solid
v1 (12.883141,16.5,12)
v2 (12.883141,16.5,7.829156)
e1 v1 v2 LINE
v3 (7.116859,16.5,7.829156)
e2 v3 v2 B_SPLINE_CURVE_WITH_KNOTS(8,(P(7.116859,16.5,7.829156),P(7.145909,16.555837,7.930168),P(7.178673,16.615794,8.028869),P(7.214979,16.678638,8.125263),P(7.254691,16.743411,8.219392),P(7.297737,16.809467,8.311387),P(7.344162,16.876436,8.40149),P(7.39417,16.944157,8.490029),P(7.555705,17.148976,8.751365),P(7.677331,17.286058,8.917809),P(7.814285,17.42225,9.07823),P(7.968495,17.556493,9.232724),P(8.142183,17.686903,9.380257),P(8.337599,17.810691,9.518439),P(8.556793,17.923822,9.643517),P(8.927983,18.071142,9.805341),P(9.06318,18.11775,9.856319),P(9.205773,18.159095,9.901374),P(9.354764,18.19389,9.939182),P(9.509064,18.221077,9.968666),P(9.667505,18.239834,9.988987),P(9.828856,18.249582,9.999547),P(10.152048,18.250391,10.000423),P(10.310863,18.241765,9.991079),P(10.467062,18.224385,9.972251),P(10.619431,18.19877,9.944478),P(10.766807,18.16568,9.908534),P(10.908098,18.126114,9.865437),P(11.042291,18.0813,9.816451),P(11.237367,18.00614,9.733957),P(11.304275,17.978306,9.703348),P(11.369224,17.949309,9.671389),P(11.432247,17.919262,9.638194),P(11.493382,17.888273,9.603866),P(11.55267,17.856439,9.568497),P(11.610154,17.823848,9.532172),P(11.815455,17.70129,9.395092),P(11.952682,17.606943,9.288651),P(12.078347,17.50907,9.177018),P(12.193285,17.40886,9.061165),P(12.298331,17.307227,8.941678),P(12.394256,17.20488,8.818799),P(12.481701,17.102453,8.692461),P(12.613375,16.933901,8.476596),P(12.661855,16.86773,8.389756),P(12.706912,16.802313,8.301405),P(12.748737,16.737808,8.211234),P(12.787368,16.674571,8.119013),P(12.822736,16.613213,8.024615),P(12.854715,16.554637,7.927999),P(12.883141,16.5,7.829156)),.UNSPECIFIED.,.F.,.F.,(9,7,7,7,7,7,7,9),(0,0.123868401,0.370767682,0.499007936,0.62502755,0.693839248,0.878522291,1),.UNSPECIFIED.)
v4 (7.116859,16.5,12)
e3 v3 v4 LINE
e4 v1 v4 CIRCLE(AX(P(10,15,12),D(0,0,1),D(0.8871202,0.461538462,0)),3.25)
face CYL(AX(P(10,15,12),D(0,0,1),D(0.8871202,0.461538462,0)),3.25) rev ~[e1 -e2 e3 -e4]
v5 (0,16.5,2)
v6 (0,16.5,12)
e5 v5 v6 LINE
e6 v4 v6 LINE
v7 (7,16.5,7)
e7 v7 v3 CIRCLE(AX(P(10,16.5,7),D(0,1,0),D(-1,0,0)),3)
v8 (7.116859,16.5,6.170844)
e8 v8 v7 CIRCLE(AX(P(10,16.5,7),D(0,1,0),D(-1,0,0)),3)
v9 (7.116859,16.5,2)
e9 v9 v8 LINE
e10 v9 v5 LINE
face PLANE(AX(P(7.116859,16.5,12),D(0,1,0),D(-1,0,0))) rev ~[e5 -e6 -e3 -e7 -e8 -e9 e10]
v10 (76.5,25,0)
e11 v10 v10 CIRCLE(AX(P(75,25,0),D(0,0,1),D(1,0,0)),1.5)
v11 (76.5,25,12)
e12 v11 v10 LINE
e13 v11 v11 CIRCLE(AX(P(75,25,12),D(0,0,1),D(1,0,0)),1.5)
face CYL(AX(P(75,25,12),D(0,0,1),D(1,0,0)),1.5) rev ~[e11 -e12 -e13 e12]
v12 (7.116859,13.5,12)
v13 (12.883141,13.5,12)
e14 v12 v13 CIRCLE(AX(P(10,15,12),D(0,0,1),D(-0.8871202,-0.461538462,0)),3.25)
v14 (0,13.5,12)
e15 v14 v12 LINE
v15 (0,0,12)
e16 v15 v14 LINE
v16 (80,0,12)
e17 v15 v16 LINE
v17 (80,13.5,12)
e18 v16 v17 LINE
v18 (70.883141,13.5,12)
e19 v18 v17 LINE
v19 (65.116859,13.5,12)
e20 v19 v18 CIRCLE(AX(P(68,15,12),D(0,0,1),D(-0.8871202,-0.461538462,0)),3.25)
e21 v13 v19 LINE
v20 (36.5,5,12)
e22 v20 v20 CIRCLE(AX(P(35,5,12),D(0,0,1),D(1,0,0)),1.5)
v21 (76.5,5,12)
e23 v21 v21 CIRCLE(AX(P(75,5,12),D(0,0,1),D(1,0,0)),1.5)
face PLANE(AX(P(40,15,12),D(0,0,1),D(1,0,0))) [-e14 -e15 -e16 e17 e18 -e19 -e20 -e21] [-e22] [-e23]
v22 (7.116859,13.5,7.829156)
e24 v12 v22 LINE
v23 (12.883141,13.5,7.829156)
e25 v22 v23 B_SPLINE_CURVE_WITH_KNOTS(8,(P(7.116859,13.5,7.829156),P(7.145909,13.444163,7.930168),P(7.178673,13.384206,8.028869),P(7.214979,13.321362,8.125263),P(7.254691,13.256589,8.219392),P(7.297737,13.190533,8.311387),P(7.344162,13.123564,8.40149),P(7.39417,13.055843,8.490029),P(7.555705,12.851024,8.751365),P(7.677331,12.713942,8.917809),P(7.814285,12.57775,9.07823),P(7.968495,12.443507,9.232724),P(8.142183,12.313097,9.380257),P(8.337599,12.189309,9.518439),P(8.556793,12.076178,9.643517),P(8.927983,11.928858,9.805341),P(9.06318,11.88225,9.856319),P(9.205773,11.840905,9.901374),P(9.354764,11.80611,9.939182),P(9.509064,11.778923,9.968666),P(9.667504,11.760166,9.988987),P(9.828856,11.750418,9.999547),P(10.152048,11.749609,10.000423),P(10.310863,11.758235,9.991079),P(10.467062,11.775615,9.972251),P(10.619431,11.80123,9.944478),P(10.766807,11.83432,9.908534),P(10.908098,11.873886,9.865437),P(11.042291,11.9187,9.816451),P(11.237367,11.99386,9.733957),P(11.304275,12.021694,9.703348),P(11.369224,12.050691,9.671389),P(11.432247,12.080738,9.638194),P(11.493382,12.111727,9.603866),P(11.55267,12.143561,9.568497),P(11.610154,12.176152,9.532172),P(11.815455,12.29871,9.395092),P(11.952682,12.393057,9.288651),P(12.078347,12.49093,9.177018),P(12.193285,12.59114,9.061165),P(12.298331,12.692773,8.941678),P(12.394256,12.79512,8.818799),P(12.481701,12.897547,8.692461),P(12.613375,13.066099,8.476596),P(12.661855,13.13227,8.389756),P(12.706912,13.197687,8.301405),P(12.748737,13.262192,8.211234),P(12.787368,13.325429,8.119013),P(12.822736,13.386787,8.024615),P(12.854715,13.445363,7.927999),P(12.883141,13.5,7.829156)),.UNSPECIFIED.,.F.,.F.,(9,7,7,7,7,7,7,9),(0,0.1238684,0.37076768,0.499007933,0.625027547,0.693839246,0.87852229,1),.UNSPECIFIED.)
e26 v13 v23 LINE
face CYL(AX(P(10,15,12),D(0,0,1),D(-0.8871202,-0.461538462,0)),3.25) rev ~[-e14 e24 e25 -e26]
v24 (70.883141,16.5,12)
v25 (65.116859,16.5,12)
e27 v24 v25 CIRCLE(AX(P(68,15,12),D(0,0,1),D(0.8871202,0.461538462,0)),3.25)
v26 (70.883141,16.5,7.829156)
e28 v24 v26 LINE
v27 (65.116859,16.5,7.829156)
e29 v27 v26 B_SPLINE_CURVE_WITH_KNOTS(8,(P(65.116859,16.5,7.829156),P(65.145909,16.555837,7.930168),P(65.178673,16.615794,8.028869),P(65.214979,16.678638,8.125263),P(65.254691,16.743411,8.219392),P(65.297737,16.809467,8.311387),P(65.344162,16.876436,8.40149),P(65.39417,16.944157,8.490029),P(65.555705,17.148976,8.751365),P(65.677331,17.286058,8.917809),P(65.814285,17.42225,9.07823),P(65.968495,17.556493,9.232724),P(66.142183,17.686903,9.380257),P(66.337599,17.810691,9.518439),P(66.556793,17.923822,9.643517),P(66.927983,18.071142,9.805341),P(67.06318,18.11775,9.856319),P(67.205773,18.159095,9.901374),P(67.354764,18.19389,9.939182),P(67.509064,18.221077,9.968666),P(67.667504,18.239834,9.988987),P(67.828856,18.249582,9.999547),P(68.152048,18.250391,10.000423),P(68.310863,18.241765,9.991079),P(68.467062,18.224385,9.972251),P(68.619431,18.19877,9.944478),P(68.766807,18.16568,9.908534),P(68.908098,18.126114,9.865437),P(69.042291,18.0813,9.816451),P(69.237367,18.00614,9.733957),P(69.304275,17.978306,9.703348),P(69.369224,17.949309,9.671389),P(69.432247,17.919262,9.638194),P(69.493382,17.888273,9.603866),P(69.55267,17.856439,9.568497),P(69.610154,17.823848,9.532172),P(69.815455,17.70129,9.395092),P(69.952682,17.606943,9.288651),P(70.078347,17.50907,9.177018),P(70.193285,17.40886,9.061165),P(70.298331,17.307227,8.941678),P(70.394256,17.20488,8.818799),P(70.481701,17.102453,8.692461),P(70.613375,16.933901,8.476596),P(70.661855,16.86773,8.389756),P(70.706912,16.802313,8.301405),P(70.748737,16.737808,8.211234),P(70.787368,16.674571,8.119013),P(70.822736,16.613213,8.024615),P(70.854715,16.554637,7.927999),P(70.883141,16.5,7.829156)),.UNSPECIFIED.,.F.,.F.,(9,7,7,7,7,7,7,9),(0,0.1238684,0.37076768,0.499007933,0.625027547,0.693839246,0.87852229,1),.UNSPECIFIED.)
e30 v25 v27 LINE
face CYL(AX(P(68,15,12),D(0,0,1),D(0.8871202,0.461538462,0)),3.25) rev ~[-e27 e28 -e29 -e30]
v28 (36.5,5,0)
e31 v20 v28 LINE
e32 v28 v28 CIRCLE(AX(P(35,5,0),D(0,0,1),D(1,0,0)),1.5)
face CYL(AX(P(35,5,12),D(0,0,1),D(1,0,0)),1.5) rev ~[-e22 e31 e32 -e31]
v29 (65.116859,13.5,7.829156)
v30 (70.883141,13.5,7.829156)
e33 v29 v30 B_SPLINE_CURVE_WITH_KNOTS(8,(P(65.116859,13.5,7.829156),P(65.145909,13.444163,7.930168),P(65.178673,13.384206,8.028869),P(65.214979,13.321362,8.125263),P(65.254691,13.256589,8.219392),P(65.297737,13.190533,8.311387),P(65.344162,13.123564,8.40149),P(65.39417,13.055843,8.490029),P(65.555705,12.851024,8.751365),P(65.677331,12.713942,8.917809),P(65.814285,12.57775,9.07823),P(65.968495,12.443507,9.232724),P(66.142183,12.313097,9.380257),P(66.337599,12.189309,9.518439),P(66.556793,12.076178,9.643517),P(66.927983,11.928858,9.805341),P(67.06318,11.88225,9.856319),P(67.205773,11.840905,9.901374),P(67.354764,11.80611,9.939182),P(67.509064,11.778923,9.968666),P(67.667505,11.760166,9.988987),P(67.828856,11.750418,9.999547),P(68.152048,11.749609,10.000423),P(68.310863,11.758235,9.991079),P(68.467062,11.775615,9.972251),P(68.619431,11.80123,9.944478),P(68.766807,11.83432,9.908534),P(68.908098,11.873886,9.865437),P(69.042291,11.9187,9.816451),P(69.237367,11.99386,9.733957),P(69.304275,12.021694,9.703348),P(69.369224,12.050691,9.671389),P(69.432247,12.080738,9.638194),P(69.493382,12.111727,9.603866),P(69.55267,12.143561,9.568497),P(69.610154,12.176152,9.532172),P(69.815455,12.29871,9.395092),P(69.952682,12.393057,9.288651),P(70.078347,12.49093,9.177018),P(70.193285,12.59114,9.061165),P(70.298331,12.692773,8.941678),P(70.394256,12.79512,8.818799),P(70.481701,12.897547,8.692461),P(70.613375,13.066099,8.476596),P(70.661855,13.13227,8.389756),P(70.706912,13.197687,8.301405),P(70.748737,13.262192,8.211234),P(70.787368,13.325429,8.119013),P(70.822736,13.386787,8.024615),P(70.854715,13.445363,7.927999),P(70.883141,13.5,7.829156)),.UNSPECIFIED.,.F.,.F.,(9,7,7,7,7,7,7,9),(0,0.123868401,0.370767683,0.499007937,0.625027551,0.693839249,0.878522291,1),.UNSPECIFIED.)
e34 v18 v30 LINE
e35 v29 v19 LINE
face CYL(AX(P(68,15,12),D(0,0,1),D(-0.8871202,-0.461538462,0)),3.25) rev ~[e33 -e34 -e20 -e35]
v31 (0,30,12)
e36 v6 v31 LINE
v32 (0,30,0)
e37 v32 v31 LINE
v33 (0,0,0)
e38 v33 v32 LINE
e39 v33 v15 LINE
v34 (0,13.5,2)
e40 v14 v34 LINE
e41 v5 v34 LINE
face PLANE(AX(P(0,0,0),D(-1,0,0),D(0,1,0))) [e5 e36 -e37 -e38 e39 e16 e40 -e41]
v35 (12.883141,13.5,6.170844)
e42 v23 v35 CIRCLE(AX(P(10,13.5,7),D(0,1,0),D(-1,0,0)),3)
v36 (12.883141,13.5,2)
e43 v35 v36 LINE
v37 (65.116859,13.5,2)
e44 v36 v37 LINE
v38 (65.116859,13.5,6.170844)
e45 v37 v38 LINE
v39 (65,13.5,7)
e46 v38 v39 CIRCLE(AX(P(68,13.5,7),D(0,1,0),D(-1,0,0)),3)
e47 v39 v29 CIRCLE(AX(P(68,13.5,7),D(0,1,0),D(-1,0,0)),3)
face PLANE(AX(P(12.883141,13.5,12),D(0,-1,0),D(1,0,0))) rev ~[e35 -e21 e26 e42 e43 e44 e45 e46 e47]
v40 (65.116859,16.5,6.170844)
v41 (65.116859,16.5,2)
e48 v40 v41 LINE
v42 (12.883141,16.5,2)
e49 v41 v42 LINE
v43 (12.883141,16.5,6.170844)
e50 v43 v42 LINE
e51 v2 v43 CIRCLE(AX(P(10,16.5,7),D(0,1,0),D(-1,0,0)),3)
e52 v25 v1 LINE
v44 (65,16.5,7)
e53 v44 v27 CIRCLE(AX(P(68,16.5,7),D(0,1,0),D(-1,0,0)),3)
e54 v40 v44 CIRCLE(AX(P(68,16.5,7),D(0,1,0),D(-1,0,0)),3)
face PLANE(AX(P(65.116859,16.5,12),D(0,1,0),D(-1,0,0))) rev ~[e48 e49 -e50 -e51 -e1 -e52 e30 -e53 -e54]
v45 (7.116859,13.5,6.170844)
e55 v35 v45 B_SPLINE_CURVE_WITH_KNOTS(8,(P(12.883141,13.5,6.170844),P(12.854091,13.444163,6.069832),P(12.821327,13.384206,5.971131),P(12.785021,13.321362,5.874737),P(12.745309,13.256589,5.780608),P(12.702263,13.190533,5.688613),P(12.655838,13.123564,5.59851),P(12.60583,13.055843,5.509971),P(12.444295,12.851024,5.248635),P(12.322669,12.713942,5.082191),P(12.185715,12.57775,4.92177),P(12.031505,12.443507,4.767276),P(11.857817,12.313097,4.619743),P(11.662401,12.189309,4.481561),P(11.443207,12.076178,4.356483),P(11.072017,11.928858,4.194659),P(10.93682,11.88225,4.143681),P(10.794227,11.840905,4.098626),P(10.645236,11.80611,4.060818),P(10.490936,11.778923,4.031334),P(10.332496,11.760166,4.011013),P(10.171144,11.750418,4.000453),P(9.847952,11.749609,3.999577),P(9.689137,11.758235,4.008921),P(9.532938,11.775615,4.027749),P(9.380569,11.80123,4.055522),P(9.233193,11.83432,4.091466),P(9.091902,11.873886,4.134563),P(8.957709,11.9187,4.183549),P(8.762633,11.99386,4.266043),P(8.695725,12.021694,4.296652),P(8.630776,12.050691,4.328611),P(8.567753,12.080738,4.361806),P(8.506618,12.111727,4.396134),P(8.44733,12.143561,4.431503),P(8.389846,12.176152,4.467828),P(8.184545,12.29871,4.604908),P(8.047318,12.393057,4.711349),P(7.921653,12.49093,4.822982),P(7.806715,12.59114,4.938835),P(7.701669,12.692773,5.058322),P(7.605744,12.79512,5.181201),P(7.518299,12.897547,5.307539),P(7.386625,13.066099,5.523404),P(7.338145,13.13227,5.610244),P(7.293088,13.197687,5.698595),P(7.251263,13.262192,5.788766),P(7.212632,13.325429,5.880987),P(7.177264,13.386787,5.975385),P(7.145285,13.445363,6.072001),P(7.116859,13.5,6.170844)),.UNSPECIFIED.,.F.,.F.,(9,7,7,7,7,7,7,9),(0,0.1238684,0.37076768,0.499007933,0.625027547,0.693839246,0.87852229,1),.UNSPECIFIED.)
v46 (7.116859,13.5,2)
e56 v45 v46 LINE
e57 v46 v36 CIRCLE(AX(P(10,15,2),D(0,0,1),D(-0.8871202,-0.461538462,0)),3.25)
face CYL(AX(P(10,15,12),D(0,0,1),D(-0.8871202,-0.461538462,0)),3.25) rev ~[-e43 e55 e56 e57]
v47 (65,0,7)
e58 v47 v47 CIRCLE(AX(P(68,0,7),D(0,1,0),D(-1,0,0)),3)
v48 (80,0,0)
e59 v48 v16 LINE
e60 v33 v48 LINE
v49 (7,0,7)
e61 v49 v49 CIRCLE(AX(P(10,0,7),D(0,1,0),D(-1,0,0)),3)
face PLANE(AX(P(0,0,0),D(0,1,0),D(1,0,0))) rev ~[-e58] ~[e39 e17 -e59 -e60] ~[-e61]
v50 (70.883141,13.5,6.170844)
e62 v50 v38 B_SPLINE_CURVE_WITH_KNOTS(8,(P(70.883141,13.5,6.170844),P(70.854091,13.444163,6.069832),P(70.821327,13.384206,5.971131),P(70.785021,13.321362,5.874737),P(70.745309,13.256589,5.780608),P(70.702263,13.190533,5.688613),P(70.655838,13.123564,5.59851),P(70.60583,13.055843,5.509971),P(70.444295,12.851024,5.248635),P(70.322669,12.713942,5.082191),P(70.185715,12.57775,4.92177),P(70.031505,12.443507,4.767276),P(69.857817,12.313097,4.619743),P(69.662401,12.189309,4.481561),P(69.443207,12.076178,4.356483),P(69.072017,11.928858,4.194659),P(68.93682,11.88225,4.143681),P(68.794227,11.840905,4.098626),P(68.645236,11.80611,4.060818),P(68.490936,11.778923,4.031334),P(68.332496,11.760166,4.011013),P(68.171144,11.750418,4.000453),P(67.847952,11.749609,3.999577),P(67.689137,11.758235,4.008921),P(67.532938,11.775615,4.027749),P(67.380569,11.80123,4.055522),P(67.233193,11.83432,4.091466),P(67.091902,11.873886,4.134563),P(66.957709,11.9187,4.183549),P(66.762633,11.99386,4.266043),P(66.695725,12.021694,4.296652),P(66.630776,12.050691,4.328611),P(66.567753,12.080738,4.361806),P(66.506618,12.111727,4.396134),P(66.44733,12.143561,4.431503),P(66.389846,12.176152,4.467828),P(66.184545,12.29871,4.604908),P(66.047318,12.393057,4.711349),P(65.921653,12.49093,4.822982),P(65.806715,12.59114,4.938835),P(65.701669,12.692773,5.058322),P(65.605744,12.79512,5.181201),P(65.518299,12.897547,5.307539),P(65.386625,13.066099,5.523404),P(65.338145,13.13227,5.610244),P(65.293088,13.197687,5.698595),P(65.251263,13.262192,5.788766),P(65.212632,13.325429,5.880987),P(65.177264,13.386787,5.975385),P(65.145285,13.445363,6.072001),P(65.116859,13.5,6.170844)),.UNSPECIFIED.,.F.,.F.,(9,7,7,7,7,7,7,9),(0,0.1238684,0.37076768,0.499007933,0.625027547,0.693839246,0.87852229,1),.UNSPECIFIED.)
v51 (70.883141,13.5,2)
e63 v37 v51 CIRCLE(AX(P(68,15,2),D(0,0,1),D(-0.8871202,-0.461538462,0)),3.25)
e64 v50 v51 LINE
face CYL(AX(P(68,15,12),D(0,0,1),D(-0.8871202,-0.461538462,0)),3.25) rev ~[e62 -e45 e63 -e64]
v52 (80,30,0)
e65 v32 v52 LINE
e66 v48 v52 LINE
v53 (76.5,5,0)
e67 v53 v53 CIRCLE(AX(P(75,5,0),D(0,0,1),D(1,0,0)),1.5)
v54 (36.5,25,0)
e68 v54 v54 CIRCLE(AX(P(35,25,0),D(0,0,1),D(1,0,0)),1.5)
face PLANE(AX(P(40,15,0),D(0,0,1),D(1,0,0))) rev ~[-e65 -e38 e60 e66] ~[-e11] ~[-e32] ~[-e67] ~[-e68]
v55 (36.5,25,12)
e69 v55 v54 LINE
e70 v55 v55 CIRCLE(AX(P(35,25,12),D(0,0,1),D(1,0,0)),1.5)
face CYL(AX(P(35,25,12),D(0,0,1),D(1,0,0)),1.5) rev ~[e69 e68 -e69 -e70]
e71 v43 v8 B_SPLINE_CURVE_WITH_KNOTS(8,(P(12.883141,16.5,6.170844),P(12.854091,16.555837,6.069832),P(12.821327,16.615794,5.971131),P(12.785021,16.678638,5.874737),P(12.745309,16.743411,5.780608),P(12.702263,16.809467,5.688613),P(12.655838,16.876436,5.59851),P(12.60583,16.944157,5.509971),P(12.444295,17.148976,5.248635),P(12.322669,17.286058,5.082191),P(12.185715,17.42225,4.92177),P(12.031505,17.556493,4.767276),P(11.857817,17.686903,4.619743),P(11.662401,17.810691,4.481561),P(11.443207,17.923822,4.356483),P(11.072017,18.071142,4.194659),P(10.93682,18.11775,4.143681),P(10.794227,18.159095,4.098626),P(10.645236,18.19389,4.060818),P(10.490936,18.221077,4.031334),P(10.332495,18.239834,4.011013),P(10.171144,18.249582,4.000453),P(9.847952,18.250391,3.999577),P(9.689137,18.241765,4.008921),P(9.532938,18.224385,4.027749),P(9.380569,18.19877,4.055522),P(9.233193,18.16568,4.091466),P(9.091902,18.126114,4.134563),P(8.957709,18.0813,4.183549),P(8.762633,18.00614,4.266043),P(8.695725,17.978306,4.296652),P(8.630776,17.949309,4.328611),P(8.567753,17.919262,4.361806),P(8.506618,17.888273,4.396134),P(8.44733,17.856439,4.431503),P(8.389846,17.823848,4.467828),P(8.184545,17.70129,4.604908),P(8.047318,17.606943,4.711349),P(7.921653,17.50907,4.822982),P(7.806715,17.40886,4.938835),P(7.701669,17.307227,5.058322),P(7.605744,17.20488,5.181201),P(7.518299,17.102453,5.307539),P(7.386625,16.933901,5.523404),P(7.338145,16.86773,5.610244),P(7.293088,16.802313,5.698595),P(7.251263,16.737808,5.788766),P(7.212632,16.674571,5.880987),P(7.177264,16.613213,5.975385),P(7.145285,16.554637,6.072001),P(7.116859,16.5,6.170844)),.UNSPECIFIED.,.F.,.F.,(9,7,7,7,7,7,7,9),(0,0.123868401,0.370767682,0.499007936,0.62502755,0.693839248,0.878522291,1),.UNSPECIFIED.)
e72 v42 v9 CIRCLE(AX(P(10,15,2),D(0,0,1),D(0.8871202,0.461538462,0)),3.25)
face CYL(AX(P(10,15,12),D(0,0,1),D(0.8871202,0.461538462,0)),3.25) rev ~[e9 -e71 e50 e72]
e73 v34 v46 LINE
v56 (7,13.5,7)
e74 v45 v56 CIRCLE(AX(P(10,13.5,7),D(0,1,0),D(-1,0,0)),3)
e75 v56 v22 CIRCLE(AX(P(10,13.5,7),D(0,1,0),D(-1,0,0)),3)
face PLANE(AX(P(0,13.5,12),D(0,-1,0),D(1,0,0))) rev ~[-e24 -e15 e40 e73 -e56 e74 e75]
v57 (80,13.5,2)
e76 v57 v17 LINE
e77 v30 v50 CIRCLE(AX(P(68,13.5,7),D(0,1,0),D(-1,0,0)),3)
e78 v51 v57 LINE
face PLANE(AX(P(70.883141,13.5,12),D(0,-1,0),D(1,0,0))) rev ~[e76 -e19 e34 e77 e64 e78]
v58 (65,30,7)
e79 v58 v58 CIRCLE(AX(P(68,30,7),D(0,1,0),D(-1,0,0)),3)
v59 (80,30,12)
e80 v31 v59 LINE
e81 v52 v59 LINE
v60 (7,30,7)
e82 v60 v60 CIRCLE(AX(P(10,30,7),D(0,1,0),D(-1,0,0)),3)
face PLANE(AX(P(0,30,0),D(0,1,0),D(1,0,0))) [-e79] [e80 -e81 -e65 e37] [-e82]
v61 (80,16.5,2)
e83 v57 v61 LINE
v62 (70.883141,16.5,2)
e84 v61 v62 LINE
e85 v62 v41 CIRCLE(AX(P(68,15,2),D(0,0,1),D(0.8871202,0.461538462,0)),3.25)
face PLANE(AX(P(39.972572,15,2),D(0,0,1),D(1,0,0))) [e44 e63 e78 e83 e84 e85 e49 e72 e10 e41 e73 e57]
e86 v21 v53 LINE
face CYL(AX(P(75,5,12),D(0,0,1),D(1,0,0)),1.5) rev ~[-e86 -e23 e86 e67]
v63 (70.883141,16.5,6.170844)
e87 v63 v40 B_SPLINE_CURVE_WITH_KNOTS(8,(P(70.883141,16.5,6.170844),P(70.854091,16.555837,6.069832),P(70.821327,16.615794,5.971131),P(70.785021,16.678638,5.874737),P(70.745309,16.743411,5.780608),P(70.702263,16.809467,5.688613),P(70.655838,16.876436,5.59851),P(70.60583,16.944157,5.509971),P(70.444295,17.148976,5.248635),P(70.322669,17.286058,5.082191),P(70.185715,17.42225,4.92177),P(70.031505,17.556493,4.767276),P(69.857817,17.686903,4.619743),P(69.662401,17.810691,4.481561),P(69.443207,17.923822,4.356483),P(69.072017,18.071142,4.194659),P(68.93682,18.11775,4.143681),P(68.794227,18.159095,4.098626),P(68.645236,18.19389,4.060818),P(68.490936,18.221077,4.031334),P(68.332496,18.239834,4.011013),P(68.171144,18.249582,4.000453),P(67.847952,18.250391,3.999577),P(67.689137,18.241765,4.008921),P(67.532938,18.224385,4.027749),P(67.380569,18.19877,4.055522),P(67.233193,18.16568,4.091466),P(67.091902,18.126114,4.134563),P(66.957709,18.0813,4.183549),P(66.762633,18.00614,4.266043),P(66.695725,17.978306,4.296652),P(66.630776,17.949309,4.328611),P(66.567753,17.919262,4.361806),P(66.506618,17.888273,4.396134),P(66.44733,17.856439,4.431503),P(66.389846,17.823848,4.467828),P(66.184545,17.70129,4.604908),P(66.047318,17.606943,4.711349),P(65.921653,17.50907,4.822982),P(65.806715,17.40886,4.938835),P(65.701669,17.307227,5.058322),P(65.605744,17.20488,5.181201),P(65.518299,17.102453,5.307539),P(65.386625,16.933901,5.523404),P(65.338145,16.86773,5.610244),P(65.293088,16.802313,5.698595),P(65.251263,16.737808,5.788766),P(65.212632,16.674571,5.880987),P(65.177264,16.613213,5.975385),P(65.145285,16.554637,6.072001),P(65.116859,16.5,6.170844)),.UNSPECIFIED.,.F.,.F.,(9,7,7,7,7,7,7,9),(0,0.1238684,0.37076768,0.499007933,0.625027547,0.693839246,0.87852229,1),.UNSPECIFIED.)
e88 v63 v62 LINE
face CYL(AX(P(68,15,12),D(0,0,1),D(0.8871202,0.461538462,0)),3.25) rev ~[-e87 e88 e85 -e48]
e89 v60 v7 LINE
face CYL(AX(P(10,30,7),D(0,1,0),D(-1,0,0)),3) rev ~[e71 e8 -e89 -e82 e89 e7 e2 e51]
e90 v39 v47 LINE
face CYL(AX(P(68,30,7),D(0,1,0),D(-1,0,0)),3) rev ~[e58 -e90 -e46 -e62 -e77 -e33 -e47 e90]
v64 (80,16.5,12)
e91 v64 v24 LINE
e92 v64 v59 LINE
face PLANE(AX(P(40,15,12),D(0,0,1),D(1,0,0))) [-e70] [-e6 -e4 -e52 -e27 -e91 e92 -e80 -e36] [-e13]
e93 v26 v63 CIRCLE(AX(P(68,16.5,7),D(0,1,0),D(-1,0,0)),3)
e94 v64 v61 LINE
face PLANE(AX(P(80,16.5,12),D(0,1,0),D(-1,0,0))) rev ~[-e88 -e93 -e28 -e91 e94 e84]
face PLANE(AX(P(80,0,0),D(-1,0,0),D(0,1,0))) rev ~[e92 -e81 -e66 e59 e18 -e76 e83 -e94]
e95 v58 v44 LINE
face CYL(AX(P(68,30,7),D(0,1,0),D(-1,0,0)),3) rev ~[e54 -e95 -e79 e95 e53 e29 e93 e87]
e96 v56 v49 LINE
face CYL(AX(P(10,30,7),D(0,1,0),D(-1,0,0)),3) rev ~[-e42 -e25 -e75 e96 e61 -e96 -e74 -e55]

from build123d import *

# Parameters (mm, degrees)
F0_W     = 80
F0_H     = 30
F1_DEPTH = 12
F2_R     = 1.5
F3_DEPTH = 25
F5_DEPTH = 5
F6_DEPTH = 10
F7_R     = 3
F8_DEPTH = 30.001


with BuildPart() as f1:
    # F0 (on Top) → F1 (new body)
    with BuildSketch(Plane.XY):
        with Locations((40, 15)):
            Rectangle(F0_W, F0_H)
    extrude(amount=F1_DEPTH)

    # F2 (on face) → F3 (cut)
    with BuildSketch(Plane.XY.offset(12)):
        with Locations((35, 5)):
            Circle(F2_R)
        with Locations((35, 25)):
            Circle(F2_R)
        with Locations((75, 5)):
            Circle(F2_R)
        with Locations((75, 25)):
            Circle(F2_R)
    extrude(amount=-F3_DEPTH, mode=Mode.SUBTRACT)

    # F4 (on face) → F5 (cut)
    with BuildSketch(Plane.XY.offset(12)):
        with BuildLine():
            Line((42.8169872981, 13.5), (65.1168593513, 13.5))
            ThreePointArc((65.1168593513, 13.5), (68, 11.75), (70.8831406487, 13.5))
            Line((70.8831406487, 13.5), (80, 13.5))
            Line((80, 13.5), (80, 16.5))
            Line((80, 16.5), (70.8831406487, 16.5))
            ThreePointArc((70.8831406487, 16.5), (68, 18.25), (65.1168593513, 16.5))
            Line((65.1168593513, 16.5), (42.8169872981, 16.5))
            Line((42.8169872981, 16.5), (12.8831406487, 16.5))
            ThreePointArc((12.8831406487, 16.5), (10, 18.25), (7.1168593513, 16.5))
            Line((7.1168593513, 16.5), (0, 16.5))
            Line((0, 16.5), (0, 13.5))
            Line((0, 13.5), (7.1168593513, 13.5))
            ThreePointArc((7.1168593513, 13.5), (10, 11.75), (12.8831406487, 13.5))
            Line((12.8831406487, 13.5), (42.8169872981, 13.5))
        make_face()
    extrude(amount=-F5_DEPTH, mode=Mode.SUBTRACT)

    # F4 (on face) → F6 (cut)
    with BuildSketch(Plane.XY.offset(12)):
        with BuildLine():
            Line((42.8169872981, 13.5), (65.1168593513, 13.5))
            ThreePointArc((65.1168593513, 13.5), (68, 11.75), (70.8831406487, 13.5))
            Line((70.8831406487, 13.5), (80, 13.5))
            Line((80, 13.5), (80, 16.5))
            Line((80, 16.5), (70.8831406487, 16.5))
            ThreePointArc((70.8831406487, 16.5), (68, 18.25), (65.1168593513, 16.5))
            Line((65.1168593513, 16.5), (42.8169872981, 16.5))
            Line((42.8169872981, 16.5), (12.8831406487, 16.5))
            ThreePointArc((12.8831406487, 16.5), (10, 18.25), (7.1168593513, 16.5))
            Line((7.1168593513, 16.5), (0, 16.5))
            Line((0, 16.5), (0, 13.5))
            Line((0, 13.5), (7.1168593513, 13.5))
            ThreePointArc((7.1168593513, 13.5), (10, 11.75), (12.8831406487, 13.5))
            Line((12.8831406487, 13.5), (42.8169872981, 13.5))
        make_face()
    extrude(amount=-F6_DEPTH, mode=Mode.SUBTRACT)

    # F7 (on face) → F8 (cut, through all)
    with BuildSketch(Plane(origin=(0, 30, 0), x_dir=(-1, 0, 0), z_dir=(0, 1, 0))):
        with Locations((-68, 7)):
            Circle(F7_R)
        with Locations((-10, 7)):
            Circle(F7_R)
    extrude(amount=-F8_DEPTH, mode=Mode.SUBTRACT)


solid = f1.part
